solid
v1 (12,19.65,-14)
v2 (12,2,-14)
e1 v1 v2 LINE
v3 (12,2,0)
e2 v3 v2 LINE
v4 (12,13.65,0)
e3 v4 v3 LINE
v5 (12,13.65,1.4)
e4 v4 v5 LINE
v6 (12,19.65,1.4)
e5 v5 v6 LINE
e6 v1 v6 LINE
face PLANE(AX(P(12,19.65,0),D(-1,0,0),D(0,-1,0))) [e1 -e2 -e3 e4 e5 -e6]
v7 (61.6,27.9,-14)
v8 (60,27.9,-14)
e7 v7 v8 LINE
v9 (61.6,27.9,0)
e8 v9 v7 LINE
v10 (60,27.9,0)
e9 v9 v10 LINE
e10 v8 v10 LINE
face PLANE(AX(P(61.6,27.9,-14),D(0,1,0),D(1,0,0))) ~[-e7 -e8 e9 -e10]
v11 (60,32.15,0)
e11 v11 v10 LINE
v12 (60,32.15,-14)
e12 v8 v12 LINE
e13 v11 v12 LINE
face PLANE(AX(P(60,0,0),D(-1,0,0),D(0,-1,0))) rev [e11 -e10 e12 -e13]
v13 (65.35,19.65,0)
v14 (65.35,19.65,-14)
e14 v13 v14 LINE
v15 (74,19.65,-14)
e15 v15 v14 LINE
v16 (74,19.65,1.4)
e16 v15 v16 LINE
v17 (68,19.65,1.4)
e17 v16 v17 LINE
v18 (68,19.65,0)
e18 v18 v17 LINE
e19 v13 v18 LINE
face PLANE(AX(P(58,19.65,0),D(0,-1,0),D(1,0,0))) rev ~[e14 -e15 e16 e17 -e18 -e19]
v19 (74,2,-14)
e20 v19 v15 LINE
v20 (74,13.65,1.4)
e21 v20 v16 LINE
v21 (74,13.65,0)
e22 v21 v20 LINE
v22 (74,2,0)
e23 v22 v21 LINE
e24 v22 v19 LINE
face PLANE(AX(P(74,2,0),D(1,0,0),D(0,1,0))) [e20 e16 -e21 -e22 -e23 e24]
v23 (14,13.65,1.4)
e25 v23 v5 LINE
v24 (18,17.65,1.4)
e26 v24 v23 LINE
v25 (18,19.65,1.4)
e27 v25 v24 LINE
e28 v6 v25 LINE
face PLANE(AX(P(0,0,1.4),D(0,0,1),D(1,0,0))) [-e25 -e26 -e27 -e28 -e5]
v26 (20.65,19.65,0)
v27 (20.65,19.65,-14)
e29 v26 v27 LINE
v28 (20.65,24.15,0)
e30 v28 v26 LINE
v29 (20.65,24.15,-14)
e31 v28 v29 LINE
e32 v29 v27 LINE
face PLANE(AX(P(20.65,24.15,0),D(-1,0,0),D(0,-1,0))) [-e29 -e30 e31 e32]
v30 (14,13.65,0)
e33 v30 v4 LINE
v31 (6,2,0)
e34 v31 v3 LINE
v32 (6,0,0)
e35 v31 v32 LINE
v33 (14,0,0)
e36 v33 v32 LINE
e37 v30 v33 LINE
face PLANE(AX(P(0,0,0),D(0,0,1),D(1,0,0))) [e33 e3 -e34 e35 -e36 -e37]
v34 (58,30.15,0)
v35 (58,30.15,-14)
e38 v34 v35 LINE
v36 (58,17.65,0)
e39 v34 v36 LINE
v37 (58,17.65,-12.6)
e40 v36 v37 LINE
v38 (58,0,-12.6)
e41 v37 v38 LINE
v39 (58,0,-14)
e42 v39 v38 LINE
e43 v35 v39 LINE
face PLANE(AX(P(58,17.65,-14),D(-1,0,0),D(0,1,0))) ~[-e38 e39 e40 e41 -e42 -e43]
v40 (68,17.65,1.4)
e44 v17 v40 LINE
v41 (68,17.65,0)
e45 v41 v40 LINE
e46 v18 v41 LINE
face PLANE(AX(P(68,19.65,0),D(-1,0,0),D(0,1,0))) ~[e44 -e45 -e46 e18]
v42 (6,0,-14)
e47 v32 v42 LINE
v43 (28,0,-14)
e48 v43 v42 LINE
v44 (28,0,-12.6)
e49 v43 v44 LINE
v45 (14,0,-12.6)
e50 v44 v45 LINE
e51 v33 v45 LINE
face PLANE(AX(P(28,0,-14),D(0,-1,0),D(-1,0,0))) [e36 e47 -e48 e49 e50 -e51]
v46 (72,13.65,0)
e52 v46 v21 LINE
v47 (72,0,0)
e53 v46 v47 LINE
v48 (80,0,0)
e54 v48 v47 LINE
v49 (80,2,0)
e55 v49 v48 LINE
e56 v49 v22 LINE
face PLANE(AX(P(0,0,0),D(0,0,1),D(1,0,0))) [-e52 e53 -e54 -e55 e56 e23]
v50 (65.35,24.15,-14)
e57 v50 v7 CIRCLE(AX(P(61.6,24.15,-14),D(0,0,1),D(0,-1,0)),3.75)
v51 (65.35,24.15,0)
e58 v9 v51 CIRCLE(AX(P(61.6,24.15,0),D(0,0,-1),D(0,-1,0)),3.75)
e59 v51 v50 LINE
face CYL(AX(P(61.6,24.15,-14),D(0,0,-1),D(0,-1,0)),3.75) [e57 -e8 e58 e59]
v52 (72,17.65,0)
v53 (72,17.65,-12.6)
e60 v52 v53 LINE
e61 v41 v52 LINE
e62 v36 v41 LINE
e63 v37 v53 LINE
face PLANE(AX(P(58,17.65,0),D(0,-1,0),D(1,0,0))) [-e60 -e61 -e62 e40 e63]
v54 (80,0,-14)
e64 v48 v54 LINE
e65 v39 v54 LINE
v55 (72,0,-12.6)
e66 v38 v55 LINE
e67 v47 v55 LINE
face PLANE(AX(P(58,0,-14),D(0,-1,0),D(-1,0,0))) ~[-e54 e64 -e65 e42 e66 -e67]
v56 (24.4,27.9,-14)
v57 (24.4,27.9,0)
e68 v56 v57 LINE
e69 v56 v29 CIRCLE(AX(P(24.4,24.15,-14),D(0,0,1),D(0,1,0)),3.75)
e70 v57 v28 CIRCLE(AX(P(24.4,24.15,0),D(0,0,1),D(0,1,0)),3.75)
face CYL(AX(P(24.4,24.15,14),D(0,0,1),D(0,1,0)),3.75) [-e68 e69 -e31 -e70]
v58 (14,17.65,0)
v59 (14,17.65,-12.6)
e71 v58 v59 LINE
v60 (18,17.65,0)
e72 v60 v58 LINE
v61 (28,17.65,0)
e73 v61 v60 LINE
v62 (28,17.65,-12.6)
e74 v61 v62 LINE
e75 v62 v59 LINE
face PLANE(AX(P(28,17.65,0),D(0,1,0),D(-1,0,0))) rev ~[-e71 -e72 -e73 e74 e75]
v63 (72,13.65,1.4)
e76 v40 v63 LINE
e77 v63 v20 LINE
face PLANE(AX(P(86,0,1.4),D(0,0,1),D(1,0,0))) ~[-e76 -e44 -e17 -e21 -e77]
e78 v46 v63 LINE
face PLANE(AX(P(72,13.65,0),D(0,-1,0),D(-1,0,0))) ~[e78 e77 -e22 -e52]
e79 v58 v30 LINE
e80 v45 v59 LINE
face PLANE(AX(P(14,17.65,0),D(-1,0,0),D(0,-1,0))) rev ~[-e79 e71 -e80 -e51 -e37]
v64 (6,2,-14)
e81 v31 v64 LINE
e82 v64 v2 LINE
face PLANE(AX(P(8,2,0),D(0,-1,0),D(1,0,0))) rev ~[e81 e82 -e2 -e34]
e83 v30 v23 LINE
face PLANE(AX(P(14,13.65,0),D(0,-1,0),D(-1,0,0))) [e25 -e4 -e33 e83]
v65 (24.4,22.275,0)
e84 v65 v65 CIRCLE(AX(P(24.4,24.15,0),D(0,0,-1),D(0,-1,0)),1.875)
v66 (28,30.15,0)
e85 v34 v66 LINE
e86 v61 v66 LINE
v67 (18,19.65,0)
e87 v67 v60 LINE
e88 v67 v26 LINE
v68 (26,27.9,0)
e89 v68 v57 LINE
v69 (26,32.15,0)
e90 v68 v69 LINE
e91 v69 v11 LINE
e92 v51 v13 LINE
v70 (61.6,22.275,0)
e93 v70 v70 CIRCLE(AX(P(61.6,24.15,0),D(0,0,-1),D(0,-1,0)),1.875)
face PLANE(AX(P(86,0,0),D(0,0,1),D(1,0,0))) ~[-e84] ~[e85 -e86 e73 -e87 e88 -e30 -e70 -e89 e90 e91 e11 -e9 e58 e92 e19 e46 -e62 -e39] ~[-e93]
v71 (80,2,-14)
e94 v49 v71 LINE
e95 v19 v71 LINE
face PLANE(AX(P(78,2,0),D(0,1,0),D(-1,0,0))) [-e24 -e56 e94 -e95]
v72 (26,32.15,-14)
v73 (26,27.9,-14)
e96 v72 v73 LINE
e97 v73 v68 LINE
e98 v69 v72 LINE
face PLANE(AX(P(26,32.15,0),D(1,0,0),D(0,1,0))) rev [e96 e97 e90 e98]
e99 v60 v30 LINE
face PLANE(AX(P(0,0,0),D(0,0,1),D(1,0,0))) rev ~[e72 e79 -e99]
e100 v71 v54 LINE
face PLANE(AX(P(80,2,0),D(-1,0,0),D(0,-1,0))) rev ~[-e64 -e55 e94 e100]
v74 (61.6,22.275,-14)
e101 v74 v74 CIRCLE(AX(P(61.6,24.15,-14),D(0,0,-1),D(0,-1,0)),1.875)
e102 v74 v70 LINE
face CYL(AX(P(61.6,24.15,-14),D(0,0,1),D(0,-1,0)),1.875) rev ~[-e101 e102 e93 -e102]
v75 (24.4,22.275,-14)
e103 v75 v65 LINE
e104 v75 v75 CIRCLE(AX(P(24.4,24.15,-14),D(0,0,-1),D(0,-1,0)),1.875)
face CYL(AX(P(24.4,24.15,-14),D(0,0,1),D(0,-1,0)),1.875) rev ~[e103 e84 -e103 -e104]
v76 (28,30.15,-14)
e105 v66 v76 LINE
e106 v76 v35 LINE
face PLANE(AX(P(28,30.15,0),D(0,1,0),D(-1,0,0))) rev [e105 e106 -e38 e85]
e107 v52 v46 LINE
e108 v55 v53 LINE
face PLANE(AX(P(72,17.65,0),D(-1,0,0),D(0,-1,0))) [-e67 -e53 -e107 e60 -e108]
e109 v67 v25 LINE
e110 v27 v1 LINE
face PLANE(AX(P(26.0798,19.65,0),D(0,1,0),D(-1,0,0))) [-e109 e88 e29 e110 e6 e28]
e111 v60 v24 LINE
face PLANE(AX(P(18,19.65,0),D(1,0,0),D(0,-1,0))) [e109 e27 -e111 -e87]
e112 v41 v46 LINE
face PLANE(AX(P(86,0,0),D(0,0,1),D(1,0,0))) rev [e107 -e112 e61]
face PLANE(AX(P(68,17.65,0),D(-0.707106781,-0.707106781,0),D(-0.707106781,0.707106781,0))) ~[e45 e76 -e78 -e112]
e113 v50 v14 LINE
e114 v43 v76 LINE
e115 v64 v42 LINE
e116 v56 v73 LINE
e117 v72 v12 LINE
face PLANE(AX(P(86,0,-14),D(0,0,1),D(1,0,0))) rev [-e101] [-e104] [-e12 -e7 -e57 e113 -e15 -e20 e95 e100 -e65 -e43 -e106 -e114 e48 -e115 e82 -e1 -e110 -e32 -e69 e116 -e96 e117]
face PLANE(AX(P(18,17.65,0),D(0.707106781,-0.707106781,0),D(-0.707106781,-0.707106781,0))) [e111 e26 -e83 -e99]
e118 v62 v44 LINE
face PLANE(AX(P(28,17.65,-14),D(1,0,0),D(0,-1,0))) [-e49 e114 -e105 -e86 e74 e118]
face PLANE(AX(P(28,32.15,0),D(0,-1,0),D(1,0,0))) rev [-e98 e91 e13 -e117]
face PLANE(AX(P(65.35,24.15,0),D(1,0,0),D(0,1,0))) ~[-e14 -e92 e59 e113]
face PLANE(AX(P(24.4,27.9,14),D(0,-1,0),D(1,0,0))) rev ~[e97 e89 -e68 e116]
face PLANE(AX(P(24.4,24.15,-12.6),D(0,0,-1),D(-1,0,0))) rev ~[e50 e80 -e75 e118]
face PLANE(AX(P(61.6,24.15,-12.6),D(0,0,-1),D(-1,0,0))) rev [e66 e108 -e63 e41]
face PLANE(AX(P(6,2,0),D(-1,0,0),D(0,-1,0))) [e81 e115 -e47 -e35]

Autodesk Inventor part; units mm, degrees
ref_plane "YZ Plane" through (0, 0, 0) normal (1, 0, 0) x (0, 1, 0)
ref_plane "XZ Plane" through (0, 0, 0) normal (0, 1, 0) x (-1, 0, 0)
ref_plane "XY Plane" through (0, 0, 0) normal (0, 0, 1) x (1, 0, 0)
sketch "スケッチ1" plane through (0, 0, 0) normal (0, 0, 1) x (1, 0, 0)
  line L0 (0, 0) -> (0, 17.65)
  line L1 (0, 17.65) -> (28, 17.65)
  line L2 (28, 17.65) -> (28, 30.15)
  line L3 (28, 30.15) -> (58, 30.15)
  line L4 (58, 30.15) -> (58, 0)
  line L5 (58, 0) -> (60, 0)
  line L6 (60, 0) -> (60, 32.15)
  line L7 (60, 32.15) -> (28, 32.15)
  line L8 (28, 32.15) -> (26, 32.15)
  line L9 (26, 32.15) -> (26, 19.65)
  line L10 (26, 19.65) -> (-2, 19.65)
  line L11 (-2, 19.65) -> (-2, 0)
  line L12 (-2, 0) -> (0, 0)
  dimension "d0" = 17.65
  dimension "d1" = 28
  dimension "d2" = 12.5
  dimension "d3" = 30
  dimension "d4" = 2
  dimension "d5" = 32.15
  dimension "d6" = 32
  dimension "d7" = 2
  dimension "d8" = 12.5
  dimension "d9" = 28
extrude "押し出し1" add sketch "スケッチ1" along normal blind 14
sketch "スケッチ2" plane through (60, 0, 0) normal (1, 0, 0) x (0, 0, -1)
  line L0 (0, 0) -> (-14, 0) projected
  line L1 (-14, 0) -> (0, 0)
  line L2 (0, 0) -> (0, 2)
  line L3 (0, 2) -> (-14, 2)
  line L4 (-14, 2) -> (-14, 0)
  dimension "d12" = 14
  dimension "d13" = 2
extrude "押し出し2" add sketch "スケッチ2" along normal blind 7
sketch "スケッチ3" plane through (-2, 0, 0) normal (-1, 0, 0) x (0, 0, 1)
  line L0 (14, 2) -> (0, 2) projected
  line L1 (0, 0) -> (14, 0)
  line L2 (14, 0) -> (14, 2)
  line L3 (14, 2) -> (0, 2)
  line L4 (0, 2) -> (0, 0)
  dimension "d16" = 14
extrude "押し出し3" add sketch "スケッチ3" along normal blind 7
sketch "スケッチ4" plane through (0, 0, 14) normal (0, 0, 1) x (1, 0, 0)
  line L0 (60, 32.15) -> (60, 24.15)
  line L1 (60, 24.15) -> (61.6, 24.15)
  arc A0 (61.6, 20.4) -> (61.6, 27.9) centre (61.6, 24.15) ccw
  line L2 (61.6, 24.15) -> (61.6, 20.4) construction
  line L3 (61.6, 24.15) -> (61.6, 27.9) construction
  line L4 (61.6, 27.9) -> (60, 27.9)
  line L5 (61.6, 20.4) -> (60, 20.4)
  line L6 (60, 2) -> (60, 32.15) projected
  line L7 (60, 27.9) -> (60, 20.4)
  point P0 (0, 0)
  dimension "d47" = 8
  dimension "d48" = 1.6
  dimension "d49" = 3.75
  dimension "d50" = 180
extrude "押し出し4" add sketch "スケッチ4" against normal blind 14
hole "穴3" at (61.6, 24.15, 14) direction (0, 0, -1) diameter 3.75 end through all
sketch "スケッチ7" plane through (0, 0, 14) normal (0, 0, 1) x (1, 0, 0)
  line L0 (60, 32.15) -> (26, 32.15) projected
  line L1 (26, 32.15) -> (26, 24.15)
  line L2 (26, 24.15) -> (24.4, 24.15)
  arc A0 (24.4, 27.9) -> (24.4, 20.4) centre (24.4, 24.15) ccw
  line L3 (24.4, 27.9) -> (26, 27.9)
  line L4 (24.4, 20.4) -> (26, 20.4)
  line L5 (26, 20.4) -> (26, 27.9)
  line L6 (26, 32.15) -> (26, 19.65) projected
  circle A1 centre (24.4, 24.15) radius 1.875
  point P0 (0, 0)
  dimension "d60" = 8
  dimension "d61" = 1.6
  dimension "d62" = 3.75
  dimension "d63" = 3.75
extrude "押し出し6" add sketch "スケッチ7" against normal blind 14 contours L1 A1 L5 L4 A0 L3 | L1 L5 A1 picked at (23.6929, 24.15)
hole "穴4" at (24.4, 24.15, 14) direction (0, 0, -1) diameter 3.75 end through all
sketch "スケッチ10" plane through (0, 17.65, 0) normal (0, -1, 0) x (1, 0, 0)
  line L0 (28, 14) -> (58, 14) projected
  line L1 (0, 0) -> (28, 0)
  line L2 (28, 0) -> (28, 14)
  line L3 (28, 14) -> (0, 14)
  line L4 (0, 14) -> (0, 0)
extrude "押し出し7" cut sketch "スケッチ10" against normal blind 0.6
sketch "スケッチ11" plane through (0, 0, 0) normal (0, -1, 0) x (1, 0, 0)
  line L0 (0, 14) -> (-9, 14) projected
  line L1 (60, 0) -> (67, 0) projected
  line L2 (-9, 14) -> (67, 14)
  line L3 (67, 14) -> (67, 0)
  line L4 (67, 0) -> (-9, 0)
  line L5 (-9, 0) -> (-9, 14)
  point P0 (0, 0)
extrude "押し出し8" cut sketch "スケッチ11" against normal blind 0.6
sketch "スケッチ12" plane through (0, 0, 14) normal (0, 0, 1) x (1, 0, 0)
  line L0 (-2, 19.65) -> (-2, 2) projected
  line L1 (-2, 19.65) -> (4, 19.65)
  line L2 (26, 19.65) -> (-2, 19.65) projected
  line L3 (4, 19.65) -> (4, 18.25)
  line L4 (0, 18.25) -> (28, 18.25) projected
  line L5 (4, 18.25) -> (0.2844, 14.5344)
  line L6 (4, 18.25) -> (9.2547, 18.25) construction
  line L7 (0.2844, 14.5344) -> (0, 14.25)
  line L8 (0, 0.6) -> (0, 18.25) projected
  line L9 (0, 14.25) -> (-2, 14.25)
  line L10 (-2, 14.25) -> (-2, 19.65)
  point P0 (0, 0)
  dimension "d79" = 6
  dimension "d80" = 135
extrude "押し出し9" add sketch "スケッチ12" along normal blind 2
sketch "スケッチ15" plane through (0, 0, 0) normal (0, 0, -1) x (-1, 0, 0)
  line L0 (0, 0.6) -> (0, 18.25) projected
  line L1 (0, 18.25) -> (-14, 18.25)
  line L2 (-14, 18.25) -> (-14, 0.6)
  line L3 (-14, 0.6) -> (0, 0.6)
  line L4 (0, 0.6) -> (0, 18.25)
  point P0 (0, 0)
  dimension "d88" = 14
extrude "押し出し11" add sketch "スケッチ15" against normal blind 1.4
sketch "スケッチ17" plane through (67, 0, 0) normal (1, 0, 0) x (0, 0, -1)
  line L0 (0, 0.6) -> (-14, 0.6) projected
  line L1 (0, 0.6) -> (-14, 0.6)
  line L2 (-14, 0.6) -> (-14, 9.5309)
  line L3 (-14, 9.5309) -> (0, 9.5309)
  line L4 (0, 9.5309) -> (0, 0.6)
  point P0 (0, 0)
extrude "押し出し13" cut sketch "スケッチ17" against normal blind 3
sketch "スケッチ18" plane through (-9, 0, 0) normal (-1, 0, 0) x (0, 0, 1)
  line L0 (0, 0.6) -> (14, 0.6) projected
  line L1 (0, 0.6) -> (14, 0.6)
  line L2 (14, 0.6) -> (14, 6.5)
  line L3 (14, 6.5) -> (0, 6.5)
  line L4 (0, 6.5) -> (0, 0.6)
  point P0 (0, 0)
extrude "押し出し14" cut sketch "スケッチ18" against normal blind 3
hole "穴5" at (-4, 2, 7) direction (0, -1, 0) diameter 2.4 end through all
hole "穴6" at (62, 2, 7) direction (0, -1, 0) diameter 2.4 end through all
mirror "ミラー1" about plane through (31.8158, 20.0509, 0) normal (0, 0, -1) of "押し出し3", "押し出し1", "押し出し4", "穴3", "押し出し2", "穴6", "穴4", "押し出し6", "押し出し7", "押し出し9", "押し出し11", "押し出し14", "押し出し13", "穴5", "押し出し8"
sketch "スケッチ19" plane through (0, 0, 14) normal (0, 0, 1) x (1, 0, 0)
  line L0 (94.8832, 81.412) -> (-62.365, 81.412)
  line L1 (-62.365, 81.412) -> (-62.365, -71.7744)
  line L2 (-62.365, -71.7744) -> (94.8832, -71.7744)
  line L3 (94.8832, -71.7744) -> (94.8832, 81.412)
  point P0 (0, 0)
extrude "押し出し15" cut sketch "スケッチ19" against normal blind 14
sketch "スケッチ20" plane through (-2, 19.65, 14) normal (0, 1, 0) x (1, 0, 0)
  line L0 (17.6833, -4.2941) -> (-12.6138, -4.2941)
  line L1 (-12.6138, -4.2941) -> (-12.6138, 1.0873)
  line L2 (-12.6138, 1.0873) -> (17.6833, 1.0873)
  line L3 (17.6833, 1.0873) -> (17.6833, -4.2941)
  point P0 (2, 14)
extrude "押し出し16" cut sketch "スケッチ20" against normal blind 14
sketch "スケッチ21" plane through (26, 27.9, -14) normal (-1, 0, 0) x (0, 0, 1)
  line L0 (0, -8.25) -> (-2, -8.25) projected
  line L1 (-2, -8.25) -> (18.9234, -8.25)
  line L2 (18.9234, -8.25) -> (18.9234, 5.2405)
  line L3 (18.9234, 5.2405) -> (-2, 5.2405)
  line L4 (-2, 5.2405) -> (-2, -8.25)
  point P0 (14, -27.9)
split body "分割1" sketch "スケッチ21" result one side removed curves L2 L3 L4 L1 removed pieces at (9.3333, 19.15, -4.6667) (58.5, 13.3, -4.6667)
sketch "スケッチ22" plane through (0, 0, 0) normal (0, 0, 1) x (1, 0, 0)
  line L0 (28, 19.65) -> (28, 30.15) projected
  line L1 (28, 19.65) -> (28, 17.65)
  line L2 (28, 17.65) -> (14, 17.65)
  line L3 (14, 17.65) -> (14, 0)
  line L4 (14, 17.65) -> (31.65, 17.65) construction
  line L5 (14, 0) -> (8, 0)
  line L6 (8, 0) -> (8, 2)
  line L7 (8, 2) -> (12, 2)
  line L8 (26.0798, 19.65) -> (12, 19.65)
  line L9 (12, 19.65) -> (12, 2)
  line L10 (58, 19.65) -> (60, 19.65) projected
  line L11 (58, 19.65) -> (58, 17.65)
  line L12 (58, 17.65) -> (72, 17.65)
  line L13 (72, 17.65) -> (72, 0)
  line L14 (72, 0) -> (78, 0)
  line L15 (78, 0) -> (78, 2)
  line L16 (78, 2) -> (74, 2)
  line L17 (74, 2) -> (74, 19.65)
  line L18 (74, 19.65) -> (60, 19.65)
  line L19 (26.0798, 19.65) -> (28, 19.65)
  line L20 (24.4, 20.4) -> (26, 20.4) projected
  line L21 (58, 19.65) -> (60, 19.65)
  point P0 (0, 0)
  dimension "d119" = 2
  dimension "d120" = 14
  dimension "d121" = 17.65
  dimension "d122" = 90
  dimension "d123" = 6
  dimension "d124" = 2
  dimension "d125" = 4
  dimension "d126" = 14
  dimension "d127" = 6
  dimension "d128" = 2
  dimension "d129" = 4
extrude "押し出し17" add sketch "スケッチ22" against normal blind 14
sketch "スケッチ23" plane through (26, 32.15, -14) normal (0, 1, 0) x (1, 0, 0)
  line L0 (32, -14) -> (2, -14) projected
  line L1 (17, -14) -> (17, 0)
  line L2 (2, 0) -> (32, 0) projected
  point P0 (-26, -14)
sketch "スケッチ25" plane through (24.4, 24.15, -14) normal (0, 0, -1) x (-1, 0, 0)
  line L0 (-3.6, -6.5) -> (10.4, -6.5) projected
  line L1 (10.4, -6.5) -> (-3.6, -6.5)
  line L2 (-3.6, -6.5) -> (-3.6, -24.15)
  line L3 (-3.6, -24.15) -> (10.4, -24.15)
  line L4 (10.4, -24.15) -> (10.4, -6.5)
  point P0 (24.4, -24.15)
extrude "押し出し18" add sketch "スケッチ25" against normal blind 1.4
ref_plane "作業平面1" through (43, 32.15, 0) normal (1, 0, 0) x (0, 0, -1)
mirror "ミラー3" about plane through (43, 32.15, 0) normal (1, 0, 0) of "押し出し18"
sketch "スケッチ26" plane through (0, 0, 0) normal (0, 0, 1) x (1, 0, 0)
  line L0 (12, 2) -> (12, 19.65) projected
  line L1 (12, 19.65) -> (18, 19.65)
  line L2 (12, 19.65) -> (26, 19.65) projected
  line L3 (18, 19.65) -> (18, 17.65)
  line L4 (28, 17.65) -> (14, 17.65) projected
  line L5 (18, 17.65) -> (14, 13.65)
  line L6 (14, 17.65) -> (14, 0) projected
  line L7 (18, 17.65) -> (23.6569, 17.65) construction
  line L8 (14, 13.65) -> (12, 13.65)
  line L9 (12, 13.65) -> (12, 19.65)
  point P0 (0, 0)
  dimension "d139" = 6
  dimension "d140" = 135
extrude "押し出し20" add sketch "スケッチ26" along normal blind 1.4
mirror "ミラー4" about plane through (43, 32.15, 0) normal (1, 0, 0) of "押し出し20"
sketch "スケッチ27" plane through (0, 0, 0) normal (0, 0, 1) x (1, 0, 0)
  line L0 (8, 2) -> (12, 2) projected
  line L1 (8, 2) -> (6, 2)
  line L2 (6, 2) -> (6, 0)
  line L3 (6, 0) -> (8, 0)
  line L4 (8, 0) -> (8, 2)
  line L5 (78, 2) -> (80, 2)
  line L6 (80, 2) -> (80, 0)
  line L7 (80, 0) -> (78, 0)
  line L8 (78, 0) -> (78, 2)
  point P0 (0, 0)
  dimension "d143" = 2
  dimension "d144" = 2
extrude "押し出し21" add sketch "スケッチ27" against normal blind 14
hole "穴7" at (77, 2, -7) direction (0, -1, 0) diameter 2.4 end through all
hole "穴8" at (9, 2, -7) direction (0, -1, 0) diameter 2.4 end through all
sketch "スケッチ28" plane through (0, 0, 0) normal (0, 0, 1) x (1, 0, 0)
  arc A0 (24.4, 27.9) -> (24.4, 20.4) centre (24.4, 24.15) ccw projected
  line L0 (20.65, 24.15) -> (20.65, 19.65)
  line L1 (12, 19.65) -> (26, 19.65) projected
  line L2 (24.4, 20.4) -> (26, 20.4) projected
  line L3 (26, 19.65) -> (26, 20.4)
  line L4 (26, 20.4) -> (20.65, 24.15)
  point P0 (0, 0)
extrude "押し出し22" add sketch "スケッチ28" against normal blind 14 contours A0 L2 L3 L1 L0
mirror "ミラー5" about plane through (43, 32.15, 0) normal (1, 0, 0) of "押し出し22"
sketch "スケッチ29" plane through (74, 2, 0) normal (0, 1, 0) x (1, 0, 0)
  circle A0 centre (3, 7) radius 1.2 projected
  circle A1 centre (3, 7) radius 1.2
  circle A2 centre (-65, 7) radius 1.2 projected
  circle A3 centre (-65, 7) radius 1.2
  point P0 (-74, 0)
extrude "押し出し23" add sketch "スケッチ29" against normal blind 2
properties part number "センサ冶具1セット穴埋めver"
